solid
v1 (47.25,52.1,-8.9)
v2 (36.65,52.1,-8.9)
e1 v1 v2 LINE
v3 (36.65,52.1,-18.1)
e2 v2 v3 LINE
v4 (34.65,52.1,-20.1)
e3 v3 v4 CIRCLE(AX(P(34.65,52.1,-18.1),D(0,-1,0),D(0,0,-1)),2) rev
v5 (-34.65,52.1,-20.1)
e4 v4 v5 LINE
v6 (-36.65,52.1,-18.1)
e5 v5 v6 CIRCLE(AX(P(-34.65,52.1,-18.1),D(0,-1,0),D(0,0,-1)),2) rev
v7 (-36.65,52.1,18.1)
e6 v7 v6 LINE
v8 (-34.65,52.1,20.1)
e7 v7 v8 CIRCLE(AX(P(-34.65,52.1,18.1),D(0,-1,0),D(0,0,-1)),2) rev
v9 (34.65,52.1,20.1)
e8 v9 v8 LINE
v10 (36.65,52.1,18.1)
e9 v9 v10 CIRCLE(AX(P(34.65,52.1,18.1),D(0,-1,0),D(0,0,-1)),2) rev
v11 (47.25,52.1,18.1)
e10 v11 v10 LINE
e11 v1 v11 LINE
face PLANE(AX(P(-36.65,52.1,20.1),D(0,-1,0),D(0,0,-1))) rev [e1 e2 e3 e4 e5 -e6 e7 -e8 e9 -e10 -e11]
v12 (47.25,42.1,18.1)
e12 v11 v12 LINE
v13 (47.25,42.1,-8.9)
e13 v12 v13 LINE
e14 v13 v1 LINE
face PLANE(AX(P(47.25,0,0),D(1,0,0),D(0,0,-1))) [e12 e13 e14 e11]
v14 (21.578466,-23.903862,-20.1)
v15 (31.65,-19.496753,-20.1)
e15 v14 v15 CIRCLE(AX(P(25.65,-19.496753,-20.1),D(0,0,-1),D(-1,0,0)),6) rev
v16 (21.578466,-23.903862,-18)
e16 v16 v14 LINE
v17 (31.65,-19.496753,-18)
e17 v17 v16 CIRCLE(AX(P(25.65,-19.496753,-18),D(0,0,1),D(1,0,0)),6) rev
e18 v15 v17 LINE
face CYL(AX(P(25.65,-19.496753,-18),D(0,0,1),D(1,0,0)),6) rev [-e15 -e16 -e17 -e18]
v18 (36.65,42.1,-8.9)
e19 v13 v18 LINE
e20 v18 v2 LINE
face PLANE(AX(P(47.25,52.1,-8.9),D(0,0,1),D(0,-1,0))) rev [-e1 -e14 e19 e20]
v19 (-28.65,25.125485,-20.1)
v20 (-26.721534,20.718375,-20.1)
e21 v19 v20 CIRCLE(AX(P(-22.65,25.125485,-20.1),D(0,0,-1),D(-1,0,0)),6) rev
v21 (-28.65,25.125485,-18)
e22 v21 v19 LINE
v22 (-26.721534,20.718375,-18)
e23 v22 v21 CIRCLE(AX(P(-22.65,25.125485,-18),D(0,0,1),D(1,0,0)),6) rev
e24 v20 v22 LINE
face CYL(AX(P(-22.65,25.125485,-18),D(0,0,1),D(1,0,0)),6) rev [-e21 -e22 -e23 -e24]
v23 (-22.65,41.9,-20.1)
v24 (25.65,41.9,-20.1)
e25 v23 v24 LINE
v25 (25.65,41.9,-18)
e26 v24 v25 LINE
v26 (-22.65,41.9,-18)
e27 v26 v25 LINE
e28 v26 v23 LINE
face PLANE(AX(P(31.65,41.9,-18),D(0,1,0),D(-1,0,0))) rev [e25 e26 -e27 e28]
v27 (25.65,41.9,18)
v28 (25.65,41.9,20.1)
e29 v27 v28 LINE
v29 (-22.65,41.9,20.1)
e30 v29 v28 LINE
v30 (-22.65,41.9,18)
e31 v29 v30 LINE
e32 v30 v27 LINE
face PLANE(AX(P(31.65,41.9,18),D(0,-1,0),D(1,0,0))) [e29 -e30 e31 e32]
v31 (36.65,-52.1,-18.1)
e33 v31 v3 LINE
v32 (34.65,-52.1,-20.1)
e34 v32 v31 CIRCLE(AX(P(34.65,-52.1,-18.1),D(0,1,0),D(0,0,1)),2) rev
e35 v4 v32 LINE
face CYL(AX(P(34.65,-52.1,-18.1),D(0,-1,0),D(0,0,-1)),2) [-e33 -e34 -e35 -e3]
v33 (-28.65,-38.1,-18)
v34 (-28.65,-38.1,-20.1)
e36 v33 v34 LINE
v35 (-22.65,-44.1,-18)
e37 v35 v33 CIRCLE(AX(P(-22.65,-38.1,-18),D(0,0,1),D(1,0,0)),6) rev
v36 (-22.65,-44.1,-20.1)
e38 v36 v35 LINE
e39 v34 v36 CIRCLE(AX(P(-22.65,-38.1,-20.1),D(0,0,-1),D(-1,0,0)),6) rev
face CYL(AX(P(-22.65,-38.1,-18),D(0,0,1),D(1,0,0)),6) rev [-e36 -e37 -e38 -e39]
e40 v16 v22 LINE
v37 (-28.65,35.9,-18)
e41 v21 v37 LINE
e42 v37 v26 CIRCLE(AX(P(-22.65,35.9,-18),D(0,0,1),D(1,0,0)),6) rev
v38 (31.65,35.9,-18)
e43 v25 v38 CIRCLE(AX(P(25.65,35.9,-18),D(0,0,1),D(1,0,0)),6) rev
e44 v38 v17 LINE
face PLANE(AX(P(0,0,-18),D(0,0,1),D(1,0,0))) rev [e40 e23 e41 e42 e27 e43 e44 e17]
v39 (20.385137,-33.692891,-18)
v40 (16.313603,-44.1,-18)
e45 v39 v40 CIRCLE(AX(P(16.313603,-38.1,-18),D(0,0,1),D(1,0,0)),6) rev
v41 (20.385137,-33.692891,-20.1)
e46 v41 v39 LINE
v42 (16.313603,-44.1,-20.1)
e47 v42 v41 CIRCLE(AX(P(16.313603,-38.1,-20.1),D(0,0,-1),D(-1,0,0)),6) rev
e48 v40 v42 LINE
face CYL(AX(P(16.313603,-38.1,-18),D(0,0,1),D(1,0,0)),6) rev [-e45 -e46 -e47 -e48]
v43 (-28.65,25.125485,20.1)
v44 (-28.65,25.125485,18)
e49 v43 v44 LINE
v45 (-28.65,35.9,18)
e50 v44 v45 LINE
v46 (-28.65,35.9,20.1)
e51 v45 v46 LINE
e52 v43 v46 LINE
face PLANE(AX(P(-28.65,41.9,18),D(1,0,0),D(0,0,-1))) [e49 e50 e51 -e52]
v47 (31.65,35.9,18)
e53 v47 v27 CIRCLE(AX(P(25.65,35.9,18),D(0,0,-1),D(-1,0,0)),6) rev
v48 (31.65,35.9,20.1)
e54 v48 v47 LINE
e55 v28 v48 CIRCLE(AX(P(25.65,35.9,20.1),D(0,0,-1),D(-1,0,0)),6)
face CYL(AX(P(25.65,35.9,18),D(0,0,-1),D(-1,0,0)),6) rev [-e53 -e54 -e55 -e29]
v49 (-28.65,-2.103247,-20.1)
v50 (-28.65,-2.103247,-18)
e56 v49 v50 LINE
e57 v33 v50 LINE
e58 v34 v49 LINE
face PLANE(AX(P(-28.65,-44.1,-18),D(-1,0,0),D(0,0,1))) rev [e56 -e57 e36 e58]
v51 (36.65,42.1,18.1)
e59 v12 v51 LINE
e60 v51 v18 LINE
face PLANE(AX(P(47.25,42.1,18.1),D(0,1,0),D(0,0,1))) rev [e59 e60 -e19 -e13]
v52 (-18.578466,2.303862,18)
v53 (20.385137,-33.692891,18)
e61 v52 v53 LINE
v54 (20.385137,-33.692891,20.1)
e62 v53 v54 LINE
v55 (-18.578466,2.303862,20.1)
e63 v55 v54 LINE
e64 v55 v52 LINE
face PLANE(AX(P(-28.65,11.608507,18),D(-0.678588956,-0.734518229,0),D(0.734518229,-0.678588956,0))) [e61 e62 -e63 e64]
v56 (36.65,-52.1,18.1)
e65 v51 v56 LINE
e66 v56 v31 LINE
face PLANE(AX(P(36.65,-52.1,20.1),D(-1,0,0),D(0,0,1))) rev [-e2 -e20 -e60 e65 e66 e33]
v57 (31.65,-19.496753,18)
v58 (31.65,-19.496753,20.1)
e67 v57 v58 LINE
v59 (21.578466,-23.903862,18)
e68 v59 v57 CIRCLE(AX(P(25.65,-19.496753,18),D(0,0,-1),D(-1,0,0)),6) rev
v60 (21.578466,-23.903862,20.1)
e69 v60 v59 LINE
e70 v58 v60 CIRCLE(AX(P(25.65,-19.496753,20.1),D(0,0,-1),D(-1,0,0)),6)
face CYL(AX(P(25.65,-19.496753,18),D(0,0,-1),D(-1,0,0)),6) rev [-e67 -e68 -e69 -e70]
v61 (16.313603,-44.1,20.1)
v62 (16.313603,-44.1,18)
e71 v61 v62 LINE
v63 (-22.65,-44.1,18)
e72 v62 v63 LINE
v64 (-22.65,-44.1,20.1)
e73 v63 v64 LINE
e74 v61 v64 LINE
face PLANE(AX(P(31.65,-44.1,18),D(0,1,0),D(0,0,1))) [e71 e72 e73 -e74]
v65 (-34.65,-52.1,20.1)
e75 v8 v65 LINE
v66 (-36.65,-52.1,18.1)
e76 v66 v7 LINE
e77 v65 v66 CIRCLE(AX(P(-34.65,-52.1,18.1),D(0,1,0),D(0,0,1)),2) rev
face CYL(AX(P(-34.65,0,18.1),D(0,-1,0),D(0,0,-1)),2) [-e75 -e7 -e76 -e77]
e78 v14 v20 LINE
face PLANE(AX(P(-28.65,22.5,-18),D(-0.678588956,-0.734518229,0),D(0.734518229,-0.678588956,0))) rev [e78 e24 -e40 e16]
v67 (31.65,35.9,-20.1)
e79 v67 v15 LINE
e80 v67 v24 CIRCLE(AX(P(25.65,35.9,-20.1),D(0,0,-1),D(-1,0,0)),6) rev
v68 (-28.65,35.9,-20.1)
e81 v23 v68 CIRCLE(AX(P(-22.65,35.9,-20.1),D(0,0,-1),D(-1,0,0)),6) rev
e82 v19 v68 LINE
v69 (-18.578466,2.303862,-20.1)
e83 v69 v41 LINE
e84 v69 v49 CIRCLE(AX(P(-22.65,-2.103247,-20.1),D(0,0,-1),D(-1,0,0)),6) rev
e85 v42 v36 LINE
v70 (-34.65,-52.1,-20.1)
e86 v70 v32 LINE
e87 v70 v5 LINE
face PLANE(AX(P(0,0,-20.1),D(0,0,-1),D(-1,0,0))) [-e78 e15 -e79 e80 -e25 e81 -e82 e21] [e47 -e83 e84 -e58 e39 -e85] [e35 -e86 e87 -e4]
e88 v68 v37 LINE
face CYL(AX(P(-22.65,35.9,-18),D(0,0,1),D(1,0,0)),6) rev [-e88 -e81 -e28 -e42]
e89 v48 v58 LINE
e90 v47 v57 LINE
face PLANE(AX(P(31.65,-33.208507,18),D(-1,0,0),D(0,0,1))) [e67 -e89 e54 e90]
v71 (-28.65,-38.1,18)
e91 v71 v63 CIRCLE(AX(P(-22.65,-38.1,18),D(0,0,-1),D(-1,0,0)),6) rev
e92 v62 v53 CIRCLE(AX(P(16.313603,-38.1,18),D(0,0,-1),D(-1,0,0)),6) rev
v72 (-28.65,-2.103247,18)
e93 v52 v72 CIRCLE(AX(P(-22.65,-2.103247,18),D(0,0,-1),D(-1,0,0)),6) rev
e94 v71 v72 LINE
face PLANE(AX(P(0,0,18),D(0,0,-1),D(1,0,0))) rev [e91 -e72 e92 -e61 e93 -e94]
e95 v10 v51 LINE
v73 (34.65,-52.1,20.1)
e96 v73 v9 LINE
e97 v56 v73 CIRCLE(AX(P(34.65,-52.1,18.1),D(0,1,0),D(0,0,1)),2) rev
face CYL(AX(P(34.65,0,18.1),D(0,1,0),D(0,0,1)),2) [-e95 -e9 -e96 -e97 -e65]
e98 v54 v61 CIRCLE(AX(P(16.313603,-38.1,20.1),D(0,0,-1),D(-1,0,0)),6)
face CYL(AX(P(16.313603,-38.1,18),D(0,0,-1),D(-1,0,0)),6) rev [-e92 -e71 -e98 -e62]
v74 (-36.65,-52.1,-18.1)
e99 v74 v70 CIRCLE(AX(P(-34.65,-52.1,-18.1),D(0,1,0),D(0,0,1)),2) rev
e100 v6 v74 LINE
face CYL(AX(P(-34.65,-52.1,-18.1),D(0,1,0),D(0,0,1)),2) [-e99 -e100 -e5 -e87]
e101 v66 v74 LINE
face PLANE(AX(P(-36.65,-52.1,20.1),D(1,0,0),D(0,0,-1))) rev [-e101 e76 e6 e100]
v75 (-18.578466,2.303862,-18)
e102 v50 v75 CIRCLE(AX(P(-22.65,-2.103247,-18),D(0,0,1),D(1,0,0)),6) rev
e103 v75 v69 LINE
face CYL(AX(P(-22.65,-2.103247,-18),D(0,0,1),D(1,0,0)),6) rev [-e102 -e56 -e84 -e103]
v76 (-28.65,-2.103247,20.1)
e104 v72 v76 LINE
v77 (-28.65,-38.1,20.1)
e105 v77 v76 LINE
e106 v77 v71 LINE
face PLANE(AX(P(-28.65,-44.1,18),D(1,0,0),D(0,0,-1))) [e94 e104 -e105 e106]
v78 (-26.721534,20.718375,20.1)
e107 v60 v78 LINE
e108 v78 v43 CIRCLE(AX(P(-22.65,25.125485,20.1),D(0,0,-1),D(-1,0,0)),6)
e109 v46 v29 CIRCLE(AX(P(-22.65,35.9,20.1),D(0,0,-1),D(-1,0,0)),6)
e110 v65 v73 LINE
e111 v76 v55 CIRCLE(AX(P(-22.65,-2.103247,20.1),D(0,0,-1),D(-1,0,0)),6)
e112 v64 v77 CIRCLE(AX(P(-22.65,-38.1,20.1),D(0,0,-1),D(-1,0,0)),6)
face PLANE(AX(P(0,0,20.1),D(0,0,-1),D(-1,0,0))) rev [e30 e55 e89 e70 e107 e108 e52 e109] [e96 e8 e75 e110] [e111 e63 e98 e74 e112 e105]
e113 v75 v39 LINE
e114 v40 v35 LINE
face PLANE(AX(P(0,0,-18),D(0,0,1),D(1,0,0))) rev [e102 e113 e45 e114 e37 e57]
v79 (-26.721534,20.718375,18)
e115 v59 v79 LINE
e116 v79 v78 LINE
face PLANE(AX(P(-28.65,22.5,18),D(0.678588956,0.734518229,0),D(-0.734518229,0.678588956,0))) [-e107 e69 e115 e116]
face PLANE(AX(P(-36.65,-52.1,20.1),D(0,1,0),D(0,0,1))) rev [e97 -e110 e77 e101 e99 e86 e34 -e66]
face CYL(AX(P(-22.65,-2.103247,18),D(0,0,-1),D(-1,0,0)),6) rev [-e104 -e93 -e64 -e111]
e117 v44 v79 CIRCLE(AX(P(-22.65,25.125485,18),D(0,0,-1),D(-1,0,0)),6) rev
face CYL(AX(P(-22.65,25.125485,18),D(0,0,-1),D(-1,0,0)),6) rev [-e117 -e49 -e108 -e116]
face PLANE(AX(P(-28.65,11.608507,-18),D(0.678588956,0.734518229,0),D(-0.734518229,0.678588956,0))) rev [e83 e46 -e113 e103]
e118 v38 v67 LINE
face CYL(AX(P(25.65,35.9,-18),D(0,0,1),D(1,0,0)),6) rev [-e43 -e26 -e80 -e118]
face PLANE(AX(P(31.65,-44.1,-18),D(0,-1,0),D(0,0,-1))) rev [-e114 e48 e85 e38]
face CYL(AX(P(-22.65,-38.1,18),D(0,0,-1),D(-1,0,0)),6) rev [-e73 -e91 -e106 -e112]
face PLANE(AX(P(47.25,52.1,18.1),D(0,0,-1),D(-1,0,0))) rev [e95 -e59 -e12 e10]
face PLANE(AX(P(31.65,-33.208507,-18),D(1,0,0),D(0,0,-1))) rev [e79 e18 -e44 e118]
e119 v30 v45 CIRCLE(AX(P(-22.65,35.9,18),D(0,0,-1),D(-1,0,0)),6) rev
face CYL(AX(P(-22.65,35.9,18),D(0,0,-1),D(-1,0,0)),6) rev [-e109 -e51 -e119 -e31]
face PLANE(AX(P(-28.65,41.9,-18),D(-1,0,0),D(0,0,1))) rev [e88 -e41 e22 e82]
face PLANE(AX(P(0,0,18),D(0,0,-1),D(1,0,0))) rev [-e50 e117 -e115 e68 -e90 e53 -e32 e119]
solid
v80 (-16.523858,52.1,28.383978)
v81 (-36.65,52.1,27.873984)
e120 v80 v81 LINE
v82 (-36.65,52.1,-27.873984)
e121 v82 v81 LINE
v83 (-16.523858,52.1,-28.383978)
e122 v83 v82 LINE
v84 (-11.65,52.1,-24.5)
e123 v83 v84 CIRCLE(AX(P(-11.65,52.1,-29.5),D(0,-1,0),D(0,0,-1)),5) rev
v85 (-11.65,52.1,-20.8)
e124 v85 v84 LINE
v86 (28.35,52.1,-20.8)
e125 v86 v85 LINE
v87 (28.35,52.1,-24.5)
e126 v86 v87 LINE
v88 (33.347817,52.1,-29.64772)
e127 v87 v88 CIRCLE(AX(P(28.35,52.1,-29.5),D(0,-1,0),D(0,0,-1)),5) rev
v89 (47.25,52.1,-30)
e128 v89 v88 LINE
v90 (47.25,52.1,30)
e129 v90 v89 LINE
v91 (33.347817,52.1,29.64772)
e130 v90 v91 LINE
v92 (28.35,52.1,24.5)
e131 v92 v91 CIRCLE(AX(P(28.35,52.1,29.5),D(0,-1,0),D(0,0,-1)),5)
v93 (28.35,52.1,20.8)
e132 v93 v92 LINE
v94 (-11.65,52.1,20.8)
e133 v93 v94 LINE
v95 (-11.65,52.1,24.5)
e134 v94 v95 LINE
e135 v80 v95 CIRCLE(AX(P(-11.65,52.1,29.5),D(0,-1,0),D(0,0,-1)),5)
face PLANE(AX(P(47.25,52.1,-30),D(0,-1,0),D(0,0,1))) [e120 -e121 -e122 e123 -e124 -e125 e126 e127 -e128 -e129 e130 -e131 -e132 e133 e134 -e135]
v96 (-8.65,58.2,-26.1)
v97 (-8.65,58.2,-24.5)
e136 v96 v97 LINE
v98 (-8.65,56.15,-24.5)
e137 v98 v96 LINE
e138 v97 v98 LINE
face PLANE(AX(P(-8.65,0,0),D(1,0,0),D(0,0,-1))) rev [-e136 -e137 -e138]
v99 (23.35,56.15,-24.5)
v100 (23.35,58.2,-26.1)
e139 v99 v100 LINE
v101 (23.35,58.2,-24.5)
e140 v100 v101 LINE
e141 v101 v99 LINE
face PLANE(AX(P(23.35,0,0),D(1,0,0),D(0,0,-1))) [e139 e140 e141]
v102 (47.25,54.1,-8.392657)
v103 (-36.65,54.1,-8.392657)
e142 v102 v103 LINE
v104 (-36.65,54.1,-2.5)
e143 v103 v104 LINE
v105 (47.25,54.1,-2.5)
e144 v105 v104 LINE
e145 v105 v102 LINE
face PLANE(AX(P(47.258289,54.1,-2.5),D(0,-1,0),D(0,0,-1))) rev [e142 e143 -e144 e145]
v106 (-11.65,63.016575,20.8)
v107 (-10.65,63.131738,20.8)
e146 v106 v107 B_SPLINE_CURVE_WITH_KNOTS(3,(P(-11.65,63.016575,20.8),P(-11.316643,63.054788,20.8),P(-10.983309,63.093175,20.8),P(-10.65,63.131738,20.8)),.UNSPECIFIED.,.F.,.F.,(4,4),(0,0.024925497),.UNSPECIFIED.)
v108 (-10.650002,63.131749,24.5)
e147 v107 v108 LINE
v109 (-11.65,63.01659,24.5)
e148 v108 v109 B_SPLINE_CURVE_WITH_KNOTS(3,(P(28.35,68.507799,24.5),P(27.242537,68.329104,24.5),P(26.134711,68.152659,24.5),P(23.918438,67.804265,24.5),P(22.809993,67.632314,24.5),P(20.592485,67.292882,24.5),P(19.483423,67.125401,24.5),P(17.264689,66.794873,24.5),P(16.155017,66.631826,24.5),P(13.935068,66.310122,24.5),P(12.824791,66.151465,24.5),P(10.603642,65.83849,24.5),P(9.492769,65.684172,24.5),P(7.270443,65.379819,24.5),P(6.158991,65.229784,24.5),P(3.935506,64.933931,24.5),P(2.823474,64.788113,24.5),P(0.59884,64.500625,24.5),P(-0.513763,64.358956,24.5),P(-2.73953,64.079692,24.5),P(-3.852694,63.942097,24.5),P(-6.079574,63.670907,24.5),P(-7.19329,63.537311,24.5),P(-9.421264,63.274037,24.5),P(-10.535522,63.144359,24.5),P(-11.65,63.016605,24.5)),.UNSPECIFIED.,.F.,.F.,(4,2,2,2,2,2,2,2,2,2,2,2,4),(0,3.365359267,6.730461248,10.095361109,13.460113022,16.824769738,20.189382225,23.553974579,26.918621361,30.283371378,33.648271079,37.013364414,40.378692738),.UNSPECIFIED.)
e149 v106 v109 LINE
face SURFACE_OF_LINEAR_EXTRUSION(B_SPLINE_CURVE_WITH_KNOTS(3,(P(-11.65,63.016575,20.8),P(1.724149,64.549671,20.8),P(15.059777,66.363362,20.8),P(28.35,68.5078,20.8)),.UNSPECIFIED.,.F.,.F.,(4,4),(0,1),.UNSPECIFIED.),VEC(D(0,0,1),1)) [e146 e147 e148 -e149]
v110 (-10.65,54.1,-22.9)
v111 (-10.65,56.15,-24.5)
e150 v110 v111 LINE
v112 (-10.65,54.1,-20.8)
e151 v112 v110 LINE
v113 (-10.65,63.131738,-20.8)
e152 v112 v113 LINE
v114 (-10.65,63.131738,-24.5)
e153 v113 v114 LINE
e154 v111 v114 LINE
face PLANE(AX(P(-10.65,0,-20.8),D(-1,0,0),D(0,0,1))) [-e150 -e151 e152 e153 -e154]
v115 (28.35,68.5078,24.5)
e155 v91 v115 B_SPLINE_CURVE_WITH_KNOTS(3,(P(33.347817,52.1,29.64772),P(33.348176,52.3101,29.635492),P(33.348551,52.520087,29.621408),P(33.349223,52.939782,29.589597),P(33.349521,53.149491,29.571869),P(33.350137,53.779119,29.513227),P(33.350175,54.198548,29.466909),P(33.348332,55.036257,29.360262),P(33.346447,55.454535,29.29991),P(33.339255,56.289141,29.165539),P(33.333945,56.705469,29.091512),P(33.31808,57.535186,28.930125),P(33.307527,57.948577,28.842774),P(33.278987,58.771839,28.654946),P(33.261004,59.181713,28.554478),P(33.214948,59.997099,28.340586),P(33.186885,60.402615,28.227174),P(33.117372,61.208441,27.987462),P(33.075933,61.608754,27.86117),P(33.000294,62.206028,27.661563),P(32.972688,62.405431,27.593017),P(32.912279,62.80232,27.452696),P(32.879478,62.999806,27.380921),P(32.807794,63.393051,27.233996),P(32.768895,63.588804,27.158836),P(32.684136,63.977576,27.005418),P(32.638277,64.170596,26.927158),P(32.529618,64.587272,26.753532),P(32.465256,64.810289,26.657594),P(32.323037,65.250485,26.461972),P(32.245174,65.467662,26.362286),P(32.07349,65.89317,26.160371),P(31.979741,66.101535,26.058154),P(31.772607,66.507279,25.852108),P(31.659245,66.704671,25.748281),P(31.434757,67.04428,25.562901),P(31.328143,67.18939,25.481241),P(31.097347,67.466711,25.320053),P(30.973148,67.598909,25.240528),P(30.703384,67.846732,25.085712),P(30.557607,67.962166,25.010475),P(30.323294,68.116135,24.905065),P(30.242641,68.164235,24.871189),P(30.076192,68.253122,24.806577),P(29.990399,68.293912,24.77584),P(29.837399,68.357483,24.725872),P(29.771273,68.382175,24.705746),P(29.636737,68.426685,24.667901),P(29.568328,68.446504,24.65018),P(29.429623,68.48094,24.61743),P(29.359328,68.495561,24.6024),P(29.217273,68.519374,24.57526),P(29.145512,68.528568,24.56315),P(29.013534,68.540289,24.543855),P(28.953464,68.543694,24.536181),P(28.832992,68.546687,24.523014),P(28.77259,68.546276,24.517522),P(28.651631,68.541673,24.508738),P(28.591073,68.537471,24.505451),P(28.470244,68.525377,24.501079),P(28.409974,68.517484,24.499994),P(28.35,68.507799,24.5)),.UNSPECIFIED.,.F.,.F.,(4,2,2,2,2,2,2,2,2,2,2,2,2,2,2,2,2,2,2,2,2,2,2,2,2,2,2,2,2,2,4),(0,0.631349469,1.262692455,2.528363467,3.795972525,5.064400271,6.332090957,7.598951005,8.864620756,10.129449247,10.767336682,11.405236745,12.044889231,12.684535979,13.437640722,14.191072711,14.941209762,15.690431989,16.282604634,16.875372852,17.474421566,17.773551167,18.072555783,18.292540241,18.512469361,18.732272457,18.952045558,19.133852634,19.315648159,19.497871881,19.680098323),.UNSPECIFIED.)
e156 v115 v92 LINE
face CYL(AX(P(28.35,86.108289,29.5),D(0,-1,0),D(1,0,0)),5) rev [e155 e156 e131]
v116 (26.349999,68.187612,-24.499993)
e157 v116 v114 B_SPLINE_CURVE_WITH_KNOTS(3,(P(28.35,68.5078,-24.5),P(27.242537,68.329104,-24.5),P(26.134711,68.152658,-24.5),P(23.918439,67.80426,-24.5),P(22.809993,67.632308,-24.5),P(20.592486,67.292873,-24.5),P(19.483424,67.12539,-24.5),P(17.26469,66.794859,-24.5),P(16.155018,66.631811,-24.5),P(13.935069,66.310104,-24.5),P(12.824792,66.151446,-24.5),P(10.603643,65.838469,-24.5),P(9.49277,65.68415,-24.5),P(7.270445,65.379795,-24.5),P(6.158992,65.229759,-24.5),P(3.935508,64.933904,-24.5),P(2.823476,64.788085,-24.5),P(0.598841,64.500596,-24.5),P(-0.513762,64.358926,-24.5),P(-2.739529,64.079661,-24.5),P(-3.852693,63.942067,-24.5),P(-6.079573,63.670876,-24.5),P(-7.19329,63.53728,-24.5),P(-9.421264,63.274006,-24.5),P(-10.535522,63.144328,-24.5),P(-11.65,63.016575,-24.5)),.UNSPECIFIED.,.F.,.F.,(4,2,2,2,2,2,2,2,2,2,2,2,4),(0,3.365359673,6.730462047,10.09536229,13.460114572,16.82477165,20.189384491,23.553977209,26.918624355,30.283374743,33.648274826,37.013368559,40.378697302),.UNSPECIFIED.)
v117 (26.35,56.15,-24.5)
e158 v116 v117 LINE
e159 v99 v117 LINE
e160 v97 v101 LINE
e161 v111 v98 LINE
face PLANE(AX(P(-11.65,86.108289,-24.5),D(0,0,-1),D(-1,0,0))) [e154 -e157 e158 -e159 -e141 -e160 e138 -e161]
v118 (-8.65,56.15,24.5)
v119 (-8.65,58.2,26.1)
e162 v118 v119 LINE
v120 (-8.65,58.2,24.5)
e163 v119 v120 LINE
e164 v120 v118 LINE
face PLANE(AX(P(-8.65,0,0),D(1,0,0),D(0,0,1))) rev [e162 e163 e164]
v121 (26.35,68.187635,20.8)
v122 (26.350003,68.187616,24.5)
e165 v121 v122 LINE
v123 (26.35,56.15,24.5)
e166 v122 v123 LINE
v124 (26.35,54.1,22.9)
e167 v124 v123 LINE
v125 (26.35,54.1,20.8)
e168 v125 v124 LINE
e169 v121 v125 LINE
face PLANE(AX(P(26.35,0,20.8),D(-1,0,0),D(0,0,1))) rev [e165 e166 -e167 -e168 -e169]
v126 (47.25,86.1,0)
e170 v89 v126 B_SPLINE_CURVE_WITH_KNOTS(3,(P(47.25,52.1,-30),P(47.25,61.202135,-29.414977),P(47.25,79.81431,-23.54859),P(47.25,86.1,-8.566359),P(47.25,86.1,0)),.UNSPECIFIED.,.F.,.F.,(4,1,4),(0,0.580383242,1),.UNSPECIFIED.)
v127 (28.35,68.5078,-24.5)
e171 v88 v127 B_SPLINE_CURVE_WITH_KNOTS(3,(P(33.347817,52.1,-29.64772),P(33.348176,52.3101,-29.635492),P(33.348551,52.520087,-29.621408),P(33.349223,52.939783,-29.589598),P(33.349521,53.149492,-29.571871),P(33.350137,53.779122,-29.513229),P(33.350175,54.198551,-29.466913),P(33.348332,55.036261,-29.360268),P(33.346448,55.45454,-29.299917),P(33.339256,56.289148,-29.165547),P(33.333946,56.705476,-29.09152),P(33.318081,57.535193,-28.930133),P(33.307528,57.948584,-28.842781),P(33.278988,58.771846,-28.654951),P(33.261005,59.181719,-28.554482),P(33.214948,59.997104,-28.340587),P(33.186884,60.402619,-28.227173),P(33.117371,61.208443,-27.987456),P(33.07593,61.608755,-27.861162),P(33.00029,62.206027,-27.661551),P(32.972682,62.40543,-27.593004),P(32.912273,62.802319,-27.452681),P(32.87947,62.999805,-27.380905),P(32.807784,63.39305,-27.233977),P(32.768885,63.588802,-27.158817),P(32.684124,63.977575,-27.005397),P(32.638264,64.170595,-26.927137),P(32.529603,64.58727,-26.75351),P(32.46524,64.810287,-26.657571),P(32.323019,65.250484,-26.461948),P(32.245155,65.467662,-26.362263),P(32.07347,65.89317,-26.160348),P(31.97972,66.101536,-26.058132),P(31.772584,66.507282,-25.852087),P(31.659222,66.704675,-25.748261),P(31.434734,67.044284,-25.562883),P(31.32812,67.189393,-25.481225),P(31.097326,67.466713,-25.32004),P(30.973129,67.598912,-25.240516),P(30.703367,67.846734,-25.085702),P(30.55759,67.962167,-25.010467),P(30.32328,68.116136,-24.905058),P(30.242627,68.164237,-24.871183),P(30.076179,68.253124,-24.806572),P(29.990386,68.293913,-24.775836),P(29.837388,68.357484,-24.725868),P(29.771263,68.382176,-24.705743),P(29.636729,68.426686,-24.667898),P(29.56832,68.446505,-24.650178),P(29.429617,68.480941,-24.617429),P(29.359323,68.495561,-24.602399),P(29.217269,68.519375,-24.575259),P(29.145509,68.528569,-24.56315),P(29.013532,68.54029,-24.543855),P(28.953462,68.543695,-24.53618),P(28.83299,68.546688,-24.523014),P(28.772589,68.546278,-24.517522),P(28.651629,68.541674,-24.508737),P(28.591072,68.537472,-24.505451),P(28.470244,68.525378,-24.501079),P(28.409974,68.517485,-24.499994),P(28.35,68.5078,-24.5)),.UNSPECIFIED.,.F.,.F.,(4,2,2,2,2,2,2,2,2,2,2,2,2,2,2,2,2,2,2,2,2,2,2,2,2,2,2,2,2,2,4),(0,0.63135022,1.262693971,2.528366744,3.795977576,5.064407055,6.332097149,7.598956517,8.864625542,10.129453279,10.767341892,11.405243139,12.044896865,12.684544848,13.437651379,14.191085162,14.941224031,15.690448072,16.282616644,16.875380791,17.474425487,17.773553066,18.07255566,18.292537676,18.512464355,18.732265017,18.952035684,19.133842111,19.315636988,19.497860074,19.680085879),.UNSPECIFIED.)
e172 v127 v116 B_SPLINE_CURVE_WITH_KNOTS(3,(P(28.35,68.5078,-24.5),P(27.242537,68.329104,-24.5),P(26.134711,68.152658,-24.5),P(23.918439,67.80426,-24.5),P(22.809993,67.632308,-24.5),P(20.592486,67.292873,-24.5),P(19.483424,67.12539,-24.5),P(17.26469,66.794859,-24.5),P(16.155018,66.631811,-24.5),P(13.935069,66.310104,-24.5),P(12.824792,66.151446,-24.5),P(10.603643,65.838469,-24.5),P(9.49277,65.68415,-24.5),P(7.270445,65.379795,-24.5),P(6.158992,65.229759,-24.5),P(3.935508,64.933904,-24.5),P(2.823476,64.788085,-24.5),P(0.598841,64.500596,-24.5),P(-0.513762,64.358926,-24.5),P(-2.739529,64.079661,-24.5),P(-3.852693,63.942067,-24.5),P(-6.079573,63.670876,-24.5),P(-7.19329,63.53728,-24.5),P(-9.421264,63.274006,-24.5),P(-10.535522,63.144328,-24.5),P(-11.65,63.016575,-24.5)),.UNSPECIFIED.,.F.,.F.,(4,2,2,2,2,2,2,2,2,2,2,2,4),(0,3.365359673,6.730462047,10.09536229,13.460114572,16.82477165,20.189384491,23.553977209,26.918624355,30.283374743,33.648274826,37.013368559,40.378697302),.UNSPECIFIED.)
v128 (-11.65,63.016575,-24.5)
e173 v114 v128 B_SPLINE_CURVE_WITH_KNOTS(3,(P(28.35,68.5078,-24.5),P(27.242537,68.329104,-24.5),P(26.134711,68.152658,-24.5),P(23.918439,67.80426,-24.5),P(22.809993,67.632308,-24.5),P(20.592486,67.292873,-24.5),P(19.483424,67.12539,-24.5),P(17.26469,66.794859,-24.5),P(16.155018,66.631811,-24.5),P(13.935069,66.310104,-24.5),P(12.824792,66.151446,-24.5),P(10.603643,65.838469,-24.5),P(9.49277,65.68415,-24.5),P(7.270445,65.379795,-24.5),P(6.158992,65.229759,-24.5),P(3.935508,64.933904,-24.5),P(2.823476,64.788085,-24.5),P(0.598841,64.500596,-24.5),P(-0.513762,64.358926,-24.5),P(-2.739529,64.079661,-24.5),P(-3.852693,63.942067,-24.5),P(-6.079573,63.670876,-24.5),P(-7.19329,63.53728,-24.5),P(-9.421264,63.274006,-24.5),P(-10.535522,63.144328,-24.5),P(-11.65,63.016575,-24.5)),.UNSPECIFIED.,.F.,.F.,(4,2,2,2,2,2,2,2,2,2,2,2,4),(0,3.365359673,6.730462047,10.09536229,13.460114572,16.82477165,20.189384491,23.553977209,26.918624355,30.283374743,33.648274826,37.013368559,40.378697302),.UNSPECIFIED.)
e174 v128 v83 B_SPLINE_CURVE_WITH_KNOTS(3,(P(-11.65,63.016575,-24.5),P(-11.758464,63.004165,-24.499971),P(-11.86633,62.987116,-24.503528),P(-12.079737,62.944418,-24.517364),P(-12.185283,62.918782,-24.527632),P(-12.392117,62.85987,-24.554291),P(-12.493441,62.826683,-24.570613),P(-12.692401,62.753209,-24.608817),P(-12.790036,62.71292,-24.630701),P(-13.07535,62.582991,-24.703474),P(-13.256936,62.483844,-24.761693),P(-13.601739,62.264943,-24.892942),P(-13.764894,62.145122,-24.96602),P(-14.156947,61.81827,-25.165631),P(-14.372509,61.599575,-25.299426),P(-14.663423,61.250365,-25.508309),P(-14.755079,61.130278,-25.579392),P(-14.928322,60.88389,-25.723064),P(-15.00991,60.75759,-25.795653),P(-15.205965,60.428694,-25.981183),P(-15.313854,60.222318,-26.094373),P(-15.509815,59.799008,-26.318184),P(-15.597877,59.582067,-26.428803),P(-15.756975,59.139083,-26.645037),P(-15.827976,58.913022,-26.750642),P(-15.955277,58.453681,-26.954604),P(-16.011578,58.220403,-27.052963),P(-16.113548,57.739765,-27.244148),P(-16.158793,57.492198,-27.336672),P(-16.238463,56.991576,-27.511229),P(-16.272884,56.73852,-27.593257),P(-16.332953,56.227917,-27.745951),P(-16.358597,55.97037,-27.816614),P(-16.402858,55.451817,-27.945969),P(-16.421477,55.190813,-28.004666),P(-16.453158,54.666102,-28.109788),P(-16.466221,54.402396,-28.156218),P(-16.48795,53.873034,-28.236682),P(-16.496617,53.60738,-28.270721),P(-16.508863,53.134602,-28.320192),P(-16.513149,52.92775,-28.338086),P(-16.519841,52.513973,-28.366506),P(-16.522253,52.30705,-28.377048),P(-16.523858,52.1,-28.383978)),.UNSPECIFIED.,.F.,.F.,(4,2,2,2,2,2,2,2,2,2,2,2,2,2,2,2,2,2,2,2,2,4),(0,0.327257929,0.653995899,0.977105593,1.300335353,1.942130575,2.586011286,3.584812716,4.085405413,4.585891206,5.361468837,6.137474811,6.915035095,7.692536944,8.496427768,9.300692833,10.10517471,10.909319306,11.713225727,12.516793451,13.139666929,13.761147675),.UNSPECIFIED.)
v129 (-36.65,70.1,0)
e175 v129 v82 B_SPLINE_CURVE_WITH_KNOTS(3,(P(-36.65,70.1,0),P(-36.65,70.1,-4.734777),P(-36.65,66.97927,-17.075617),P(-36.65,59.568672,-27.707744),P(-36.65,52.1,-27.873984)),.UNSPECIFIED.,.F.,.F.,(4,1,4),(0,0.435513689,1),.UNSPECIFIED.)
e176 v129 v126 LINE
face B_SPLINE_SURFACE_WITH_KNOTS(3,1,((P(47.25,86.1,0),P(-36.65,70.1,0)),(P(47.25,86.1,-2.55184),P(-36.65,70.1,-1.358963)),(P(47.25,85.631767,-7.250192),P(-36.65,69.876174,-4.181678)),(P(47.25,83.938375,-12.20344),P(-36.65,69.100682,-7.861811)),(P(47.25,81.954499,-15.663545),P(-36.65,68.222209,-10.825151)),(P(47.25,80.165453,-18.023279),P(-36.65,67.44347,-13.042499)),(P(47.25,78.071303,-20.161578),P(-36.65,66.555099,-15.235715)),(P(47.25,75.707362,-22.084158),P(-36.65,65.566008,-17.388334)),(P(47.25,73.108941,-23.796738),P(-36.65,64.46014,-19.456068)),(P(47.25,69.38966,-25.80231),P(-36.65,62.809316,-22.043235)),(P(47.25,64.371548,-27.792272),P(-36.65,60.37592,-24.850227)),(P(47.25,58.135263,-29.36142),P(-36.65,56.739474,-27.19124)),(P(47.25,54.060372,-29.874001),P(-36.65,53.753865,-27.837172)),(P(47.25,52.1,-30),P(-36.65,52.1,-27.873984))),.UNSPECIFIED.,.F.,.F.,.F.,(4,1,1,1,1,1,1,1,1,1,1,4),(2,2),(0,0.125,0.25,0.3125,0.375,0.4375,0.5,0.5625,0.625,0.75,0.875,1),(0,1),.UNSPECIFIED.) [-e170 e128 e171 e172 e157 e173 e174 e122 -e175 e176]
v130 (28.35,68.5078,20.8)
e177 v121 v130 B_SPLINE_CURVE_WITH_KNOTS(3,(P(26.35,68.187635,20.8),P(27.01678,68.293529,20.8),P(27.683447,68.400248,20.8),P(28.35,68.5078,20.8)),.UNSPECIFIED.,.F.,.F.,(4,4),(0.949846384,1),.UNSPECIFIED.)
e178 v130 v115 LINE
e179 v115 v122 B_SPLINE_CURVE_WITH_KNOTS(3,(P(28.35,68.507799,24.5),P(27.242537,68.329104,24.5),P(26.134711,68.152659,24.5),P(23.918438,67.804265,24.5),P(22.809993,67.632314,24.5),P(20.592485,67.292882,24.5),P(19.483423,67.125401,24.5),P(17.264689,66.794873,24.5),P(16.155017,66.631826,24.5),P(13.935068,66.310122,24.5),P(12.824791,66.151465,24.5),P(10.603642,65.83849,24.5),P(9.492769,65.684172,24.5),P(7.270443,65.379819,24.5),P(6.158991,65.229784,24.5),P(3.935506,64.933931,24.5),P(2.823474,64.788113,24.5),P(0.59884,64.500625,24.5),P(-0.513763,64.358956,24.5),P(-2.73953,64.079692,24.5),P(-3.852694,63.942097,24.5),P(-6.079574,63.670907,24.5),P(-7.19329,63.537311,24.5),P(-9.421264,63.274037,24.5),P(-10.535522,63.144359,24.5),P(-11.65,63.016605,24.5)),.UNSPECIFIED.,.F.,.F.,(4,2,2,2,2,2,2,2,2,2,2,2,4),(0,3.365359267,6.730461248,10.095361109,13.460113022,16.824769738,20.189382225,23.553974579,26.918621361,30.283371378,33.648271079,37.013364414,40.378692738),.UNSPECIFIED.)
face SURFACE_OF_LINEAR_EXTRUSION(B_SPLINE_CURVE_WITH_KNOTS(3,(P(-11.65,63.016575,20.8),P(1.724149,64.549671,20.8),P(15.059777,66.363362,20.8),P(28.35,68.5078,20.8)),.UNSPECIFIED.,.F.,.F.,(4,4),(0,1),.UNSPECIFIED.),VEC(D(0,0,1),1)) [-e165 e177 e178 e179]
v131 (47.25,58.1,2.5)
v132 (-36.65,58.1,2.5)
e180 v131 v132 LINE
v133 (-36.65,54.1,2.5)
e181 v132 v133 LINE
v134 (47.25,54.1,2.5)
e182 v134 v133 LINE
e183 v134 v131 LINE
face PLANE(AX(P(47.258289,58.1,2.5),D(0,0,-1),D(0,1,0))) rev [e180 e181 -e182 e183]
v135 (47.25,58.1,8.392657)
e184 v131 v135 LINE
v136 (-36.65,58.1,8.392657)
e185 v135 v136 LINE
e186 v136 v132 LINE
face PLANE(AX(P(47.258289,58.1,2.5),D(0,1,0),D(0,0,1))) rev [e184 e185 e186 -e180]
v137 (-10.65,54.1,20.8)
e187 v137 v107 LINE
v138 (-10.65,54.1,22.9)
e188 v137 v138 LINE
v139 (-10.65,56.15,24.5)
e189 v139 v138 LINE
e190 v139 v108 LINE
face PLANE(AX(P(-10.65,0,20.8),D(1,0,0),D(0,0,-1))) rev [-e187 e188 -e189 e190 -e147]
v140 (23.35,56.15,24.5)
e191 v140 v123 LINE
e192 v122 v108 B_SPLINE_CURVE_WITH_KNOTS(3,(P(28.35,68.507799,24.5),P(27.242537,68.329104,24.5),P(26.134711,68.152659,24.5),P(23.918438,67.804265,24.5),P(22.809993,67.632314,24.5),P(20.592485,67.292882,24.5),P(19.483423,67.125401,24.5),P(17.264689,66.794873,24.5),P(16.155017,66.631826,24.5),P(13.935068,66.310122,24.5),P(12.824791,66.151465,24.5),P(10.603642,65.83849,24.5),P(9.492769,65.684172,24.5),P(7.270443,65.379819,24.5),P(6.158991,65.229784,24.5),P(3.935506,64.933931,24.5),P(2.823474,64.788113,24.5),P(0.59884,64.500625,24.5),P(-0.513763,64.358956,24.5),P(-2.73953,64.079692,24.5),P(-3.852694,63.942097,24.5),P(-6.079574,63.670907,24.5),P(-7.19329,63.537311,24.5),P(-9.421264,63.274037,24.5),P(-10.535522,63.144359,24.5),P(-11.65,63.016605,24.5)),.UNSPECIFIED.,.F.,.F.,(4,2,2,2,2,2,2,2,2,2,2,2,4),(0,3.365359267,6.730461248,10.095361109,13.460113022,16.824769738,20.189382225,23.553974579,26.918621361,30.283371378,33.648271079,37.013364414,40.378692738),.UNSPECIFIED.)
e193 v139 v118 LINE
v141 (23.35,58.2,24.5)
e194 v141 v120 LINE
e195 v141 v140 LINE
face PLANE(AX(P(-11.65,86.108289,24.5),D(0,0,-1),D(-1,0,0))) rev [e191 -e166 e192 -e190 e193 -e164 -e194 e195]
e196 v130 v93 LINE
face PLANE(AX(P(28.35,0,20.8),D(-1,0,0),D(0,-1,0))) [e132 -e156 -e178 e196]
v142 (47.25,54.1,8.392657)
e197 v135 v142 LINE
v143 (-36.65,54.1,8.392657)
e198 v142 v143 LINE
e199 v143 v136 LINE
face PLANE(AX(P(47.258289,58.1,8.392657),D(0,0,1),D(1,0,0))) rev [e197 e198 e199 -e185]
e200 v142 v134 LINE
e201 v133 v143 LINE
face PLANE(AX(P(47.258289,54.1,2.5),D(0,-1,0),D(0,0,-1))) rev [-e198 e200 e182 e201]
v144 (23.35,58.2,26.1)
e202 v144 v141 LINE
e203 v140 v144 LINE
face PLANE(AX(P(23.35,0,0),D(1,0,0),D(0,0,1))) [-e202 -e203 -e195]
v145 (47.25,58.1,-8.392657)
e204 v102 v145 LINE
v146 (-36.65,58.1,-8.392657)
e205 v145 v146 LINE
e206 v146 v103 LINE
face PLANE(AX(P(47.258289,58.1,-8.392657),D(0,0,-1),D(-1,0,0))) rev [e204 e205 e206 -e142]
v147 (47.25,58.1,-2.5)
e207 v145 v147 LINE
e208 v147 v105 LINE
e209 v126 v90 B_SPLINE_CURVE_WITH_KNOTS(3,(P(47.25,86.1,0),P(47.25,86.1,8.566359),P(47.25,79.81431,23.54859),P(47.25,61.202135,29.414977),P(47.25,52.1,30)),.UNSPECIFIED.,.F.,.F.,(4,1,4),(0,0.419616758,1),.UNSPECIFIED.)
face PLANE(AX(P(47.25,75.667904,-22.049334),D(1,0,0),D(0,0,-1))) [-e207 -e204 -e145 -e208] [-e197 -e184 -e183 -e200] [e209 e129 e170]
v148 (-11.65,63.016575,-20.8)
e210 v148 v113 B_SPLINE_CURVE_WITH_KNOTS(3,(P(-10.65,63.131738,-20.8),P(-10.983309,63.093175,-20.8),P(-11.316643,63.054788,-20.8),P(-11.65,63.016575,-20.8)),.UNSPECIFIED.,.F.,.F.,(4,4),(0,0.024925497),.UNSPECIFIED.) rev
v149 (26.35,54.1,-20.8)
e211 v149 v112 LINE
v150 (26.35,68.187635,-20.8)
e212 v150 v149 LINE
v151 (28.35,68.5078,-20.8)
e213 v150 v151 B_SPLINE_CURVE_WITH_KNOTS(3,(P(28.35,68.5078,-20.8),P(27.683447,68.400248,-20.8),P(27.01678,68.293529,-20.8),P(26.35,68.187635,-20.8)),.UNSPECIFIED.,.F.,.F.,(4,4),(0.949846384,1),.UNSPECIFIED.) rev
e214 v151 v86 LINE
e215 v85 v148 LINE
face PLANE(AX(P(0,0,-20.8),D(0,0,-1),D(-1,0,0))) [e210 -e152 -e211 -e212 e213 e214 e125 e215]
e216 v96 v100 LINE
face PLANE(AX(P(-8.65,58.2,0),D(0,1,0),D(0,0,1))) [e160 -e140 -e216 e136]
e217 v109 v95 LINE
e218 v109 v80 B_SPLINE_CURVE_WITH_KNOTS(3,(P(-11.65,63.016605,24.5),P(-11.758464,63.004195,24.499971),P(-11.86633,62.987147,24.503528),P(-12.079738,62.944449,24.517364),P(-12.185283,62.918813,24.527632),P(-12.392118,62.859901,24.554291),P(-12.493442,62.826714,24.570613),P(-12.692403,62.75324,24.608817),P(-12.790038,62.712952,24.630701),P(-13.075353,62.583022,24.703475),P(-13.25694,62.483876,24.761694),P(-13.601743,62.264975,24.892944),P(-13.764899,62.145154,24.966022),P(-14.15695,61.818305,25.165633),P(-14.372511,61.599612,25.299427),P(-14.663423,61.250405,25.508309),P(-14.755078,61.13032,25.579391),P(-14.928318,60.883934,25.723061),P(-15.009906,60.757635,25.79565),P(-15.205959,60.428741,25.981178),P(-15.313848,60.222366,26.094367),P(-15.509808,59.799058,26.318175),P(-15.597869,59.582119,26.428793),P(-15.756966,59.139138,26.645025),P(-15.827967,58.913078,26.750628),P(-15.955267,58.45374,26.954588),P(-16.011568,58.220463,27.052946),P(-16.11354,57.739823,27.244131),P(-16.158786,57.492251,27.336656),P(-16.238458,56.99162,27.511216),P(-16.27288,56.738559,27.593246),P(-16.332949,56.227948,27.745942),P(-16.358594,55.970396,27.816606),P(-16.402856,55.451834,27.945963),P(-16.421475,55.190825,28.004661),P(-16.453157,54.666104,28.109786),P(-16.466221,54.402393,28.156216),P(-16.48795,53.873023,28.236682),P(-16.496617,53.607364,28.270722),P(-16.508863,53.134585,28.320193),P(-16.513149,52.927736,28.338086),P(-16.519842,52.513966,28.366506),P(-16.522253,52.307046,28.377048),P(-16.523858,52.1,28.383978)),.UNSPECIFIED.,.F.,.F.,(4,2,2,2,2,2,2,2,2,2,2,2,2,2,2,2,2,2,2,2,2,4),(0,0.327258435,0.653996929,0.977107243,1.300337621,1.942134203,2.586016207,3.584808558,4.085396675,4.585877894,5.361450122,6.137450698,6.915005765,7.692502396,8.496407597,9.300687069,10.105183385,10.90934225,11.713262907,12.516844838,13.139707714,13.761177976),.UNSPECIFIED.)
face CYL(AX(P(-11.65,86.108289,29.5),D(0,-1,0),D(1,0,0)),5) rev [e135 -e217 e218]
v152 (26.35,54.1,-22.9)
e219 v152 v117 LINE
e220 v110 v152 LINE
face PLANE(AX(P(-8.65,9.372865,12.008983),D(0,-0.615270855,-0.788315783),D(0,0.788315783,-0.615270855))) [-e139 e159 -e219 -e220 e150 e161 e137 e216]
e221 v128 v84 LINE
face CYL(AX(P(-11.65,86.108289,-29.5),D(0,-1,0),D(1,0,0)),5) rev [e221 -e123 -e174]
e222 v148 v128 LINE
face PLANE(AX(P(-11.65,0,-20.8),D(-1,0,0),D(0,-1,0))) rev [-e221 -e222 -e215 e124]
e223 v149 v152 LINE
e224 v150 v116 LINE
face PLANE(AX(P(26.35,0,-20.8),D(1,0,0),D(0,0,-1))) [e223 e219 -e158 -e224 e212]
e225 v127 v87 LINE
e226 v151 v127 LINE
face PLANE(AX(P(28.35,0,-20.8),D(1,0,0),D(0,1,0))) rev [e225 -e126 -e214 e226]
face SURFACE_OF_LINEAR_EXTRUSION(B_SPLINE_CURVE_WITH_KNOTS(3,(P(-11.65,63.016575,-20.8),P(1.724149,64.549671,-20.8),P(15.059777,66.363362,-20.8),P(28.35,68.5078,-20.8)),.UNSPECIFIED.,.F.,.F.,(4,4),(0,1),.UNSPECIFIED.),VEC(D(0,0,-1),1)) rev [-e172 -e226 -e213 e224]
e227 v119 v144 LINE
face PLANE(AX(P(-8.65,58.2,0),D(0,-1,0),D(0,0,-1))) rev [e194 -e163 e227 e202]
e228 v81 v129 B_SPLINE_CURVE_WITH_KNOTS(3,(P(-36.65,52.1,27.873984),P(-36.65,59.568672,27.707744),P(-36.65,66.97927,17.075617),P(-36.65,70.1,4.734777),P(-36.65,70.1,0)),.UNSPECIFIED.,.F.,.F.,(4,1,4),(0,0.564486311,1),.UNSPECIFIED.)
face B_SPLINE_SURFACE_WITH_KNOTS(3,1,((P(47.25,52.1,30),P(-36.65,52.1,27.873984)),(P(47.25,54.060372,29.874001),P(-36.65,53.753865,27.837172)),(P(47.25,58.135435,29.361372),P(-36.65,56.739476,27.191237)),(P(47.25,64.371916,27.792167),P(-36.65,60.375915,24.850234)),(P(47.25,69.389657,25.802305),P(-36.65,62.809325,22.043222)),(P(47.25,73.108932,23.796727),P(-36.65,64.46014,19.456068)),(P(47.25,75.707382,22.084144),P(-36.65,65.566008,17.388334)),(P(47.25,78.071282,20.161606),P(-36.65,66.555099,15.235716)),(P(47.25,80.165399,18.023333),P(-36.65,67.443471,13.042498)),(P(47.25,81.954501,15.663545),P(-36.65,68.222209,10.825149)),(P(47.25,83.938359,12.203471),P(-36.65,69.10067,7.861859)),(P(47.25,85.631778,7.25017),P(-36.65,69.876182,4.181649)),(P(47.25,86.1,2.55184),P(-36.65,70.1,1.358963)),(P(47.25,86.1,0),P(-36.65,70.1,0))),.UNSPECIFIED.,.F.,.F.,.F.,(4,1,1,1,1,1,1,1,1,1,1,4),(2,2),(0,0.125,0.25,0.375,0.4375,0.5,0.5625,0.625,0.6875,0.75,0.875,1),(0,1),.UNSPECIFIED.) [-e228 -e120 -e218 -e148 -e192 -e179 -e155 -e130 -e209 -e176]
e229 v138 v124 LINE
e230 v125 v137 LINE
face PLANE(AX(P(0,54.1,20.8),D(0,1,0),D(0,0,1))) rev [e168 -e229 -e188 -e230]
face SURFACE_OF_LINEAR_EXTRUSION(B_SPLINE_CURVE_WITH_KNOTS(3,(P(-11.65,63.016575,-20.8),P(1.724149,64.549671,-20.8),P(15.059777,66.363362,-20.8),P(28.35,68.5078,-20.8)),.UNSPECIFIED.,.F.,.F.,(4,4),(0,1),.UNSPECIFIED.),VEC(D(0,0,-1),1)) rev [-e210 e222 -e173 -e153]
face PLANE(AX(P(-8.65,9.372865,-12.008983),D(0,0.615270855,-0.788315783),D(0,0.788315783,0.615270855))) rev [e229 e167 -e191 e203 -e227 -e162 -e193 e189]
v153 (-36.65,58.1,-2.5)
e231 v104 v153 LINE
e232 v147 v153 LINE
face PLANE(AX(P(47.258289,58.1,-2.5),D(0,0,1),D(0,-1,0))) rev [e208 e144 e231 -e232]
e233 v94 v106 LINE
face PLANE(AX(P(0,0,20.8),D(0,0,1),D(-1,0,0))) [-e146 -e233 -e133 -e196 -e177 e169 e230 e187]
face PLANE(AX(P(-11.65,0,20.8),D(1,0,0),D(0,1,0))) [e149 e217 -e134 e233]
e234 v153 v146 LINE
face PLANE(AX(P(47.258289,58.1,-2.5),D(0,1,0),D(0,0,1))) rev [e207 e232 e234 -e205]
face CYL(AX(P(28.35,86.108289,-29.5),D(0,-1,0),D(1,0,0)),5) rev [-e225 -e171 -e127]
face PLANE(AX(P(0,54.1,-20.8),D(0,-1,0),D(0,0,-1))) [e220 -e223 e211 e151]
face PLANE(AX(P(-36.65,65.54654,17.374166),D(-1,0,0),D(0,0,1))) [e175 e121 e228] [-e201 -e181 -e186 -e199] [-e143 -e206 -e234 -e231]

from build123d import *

# Parameters (mm, degrees)
SKETCH_1_W             = 73.3
SKETCH_1_H             = 104.2
EXTRUDE_1_DEPTH        = 20.1
SKETCH_2_W             = 27
SKETCH_2_H             = 10
EXTRUDE_2_DEPTH        = 10.6
CUT_EXTRUDE_1_DEPTH    = 150.103328411
SKETCH_13_W            = 5.892656798
SKETCH_13_H            = 4
CUT_EXTRUDE_4_DEPTH    = 124.904883035
FILLET_5_R             = 2
CUT_EXTRUDE_5_DEPTH    = 2.1
FILLET_6_R             = 6
FILLET_6_OF_MIRROR_2_R = 6
CUT_EXTRUDE_START      = -3.7
CUT_EXTRUDE_6_DEPTH    = 3.7
EXTRUDE_START          = -3
EXTRUDE_5_DEPTH        = 32
CUT_EXTRUDE_7_DEPTH    = 37


# Read off the part's stored shape, not the designer's step: 切除-拉伸6
with BuildPart() as part:
    # 草图1 → 凸台-拉伸1 (new, symmetric)
    with BuildSketch(Plane.XY):
        Rectangle(SKETCH_1_W, SKETCH_1_H)
    extrude(amount=EXTRUDE_1_DEPTH, both=True)

    # 草图2 → 凸台-拉伸2 (add)
    with BuildSketch(Plane(origin=(36.65, 0, 0), x_dir=(0, 0, -1), z_dir=(1, 0, 0))):
        with Locations((-4.6, 47.1)):
            Rectangle(SKETCH_2_W, SKETCH_2_H)
    extrude(amount=EXTRUDE_2_DEPTH)

    # 圆角5
    fillet_5_edges = [part.edges().sort_by_distance(p)[0] for p in [
        (36.65, 0, 20.1),
        (-36.65, 0, 20.1),
        (-36.65, 0, -20.1),
        (36.65, 0, -20.1),
    ]]
    fillet(fillet_5_edges, radius=FILLET_5_R - 0.0001)  # a hair under: the kernel refuses the full size

    # 草图14 → 切除-拉伸5 (cut)
    with BuildSketch(Plane(origin=(0, 0, -20.1), x_dir=(-1, 0, 0), z_dir=(0, 0, -1))):
        Polygon((-31.65, 41.9), (28.65, 41.9), (28.65, 22.5), (-31.65, -33.208507203), align=None)
        Polygon((-31.65, -44.1), (28.65, -44.1), (28.65, 11.608507203), align=None)
    cut_extrude_5 = extrude(amount=-CUT_EXTRUDE_5_DEPTH, mode=Mode.SUBTRACT)

    # 圆角6
    fillet_6_edges = [part.edges().sort_by_distance(p)[0] for p in [
        (31.65, -33.208507203, -19.05),
        (31.65, 41.9, -19.05),
        (-28.65, 41.9, -19.05),
        (-28.65, 22.5, -19.05),
        (31.65, -44.1, -19.05),
        (-28.65, 11.608507203, -19.05),
        (-28.65, -44.1, -19.05),
    ]]
    fillet(fillet_6_edges, radius=FILLET_6_R)

    # 镜向2: 切除-拉伸5 across plane
    add(cut_extrude_5.mirror(Plane.XY), mode=Mode.SUBTRACT)

    # 圆角6 of 镜向2
    fillet_6_of_mirror_2_edges = [part.edges().sort_by_distance(p)[0] for p in [
        (31.65, -33.208507203, 19.05),
        (31.65, 41.9, 19.05),
        (-28.65, 41.9, 19.05),
        (-28.65, 22.5, 19.05),
        (31.65, -44.1, 19.05),
        (-28.65, 11.608507203, 19.05),
        (-28.65, -44.1, 19.05),
    ]]
    fillet(fillet_6_of_mirror_2_edges, radius=FILLET_6_OF_MIRROR_2_R)


with BuildPart() as body_2:
    # 草图8 → 放样11 section 0
    with BuildSketch(Plane(origin=(47.25, 0, 0), x_dir=(0, 0, -1), z_dir=(1, 0, 0))):
        with BuildLine():
            Line((-30, 52.1), (30, 52.1))
            add(Edge.make_bspline(
                [(0, 86.1), (8.566359437, 86.1), (23.54859031, 79.814309679), (29.414977023, 61.202134763), (30, 52.1)],
                knots=[0, 0, 0, 0, 0.419616758, 1, 1, 1, 1], degree=3))
            add(Edge.make_bspline(
                [(0, 86.1), (-8.566359437, 86.1), (-23.54859031, 79.814309679), (-29.414977023, 61.202134763), (-30, 52.1)],
                knots=[0, 0, 0, 0, 0.419616758, 1, 1, 1, 1], degree=3))
        make_face()
    # 草图9 → 放样11 section 1
    with BuildSketch(Plane.ZY.offset(36.65)):
        with BuildLine():
            Line((-27.873983974, 52.1), (27.873983974, 52.1))
            add(Edge.make_bspline(
                [(0, 70.1), (4.734777204, 70.1), (17.075617158, 66.979270336), (27.707744353, 59.568671532), (27.873983974, 52.1)],
                knots=[0, 0, 0, 0, 0.435513689, 1, 1, 1, 1], degree=3))
            add(Edge.make_bspline(
                [(0, 70.1), (-4.734777204, 70.1), (-17.075617158, 66.979270336), (-27.707744353, 59.568671532), (-27.873983974, 52.1)],
                knots=[0, 0, 0, 0, 0.435513689, 1, 1, 1, 1], degree=3))
        make_face()
    loft()

    # 草图10 → 切除-拉伸1 (cut, through all)
    with BuildSketch(Plane.XZ.offset(52.1)):
        with BuildLine():
            Line((-11.65, 34.5), (28.35, 34.5))
            ThreePointArc((28.35, 34.5), (33.35, 29.5), (28.35, 24.5))
            Line((28.35, 24.5), (-11.65, 24.5))
            ThreePointArc((-11.65, 24.5), (-16.65, 29.5), (-11.65, 34.5))
        make_face()
    cut_extrude_1 = extrude(amount=-CUT_EXTRUDE_1_DEPTH, mode=Mode.SUBTRACT)

    # 镜向1: 切除-拉伸1 across plane
    add(cut_extrude_1.mirror(Plane.XY), mode=Mode.SUBTRACT)

    # 草图13 → 切除-拉伸4 (cut, through all)
    with BuildSketch(Plane.ZY.offset(36.65)):
        with Locations((5.446328399, 56.1)):
            Rectangle(SKETCH_13_W, SKETCH_13_H)
        with Locations((-5.446328399, 56.1)):
            Rectangle(SKETCH_13_W, SKETCH_13_H)
    extrude(amount=-CUT_EXTRUDE_4_DEPTH, mode=Mode.SUBTRACT)

    # 切除-拉伸6 outline → 切除-拉伸6 (cut)
    with BuildSketch(Plane(origin=(0, 0, -24.5), x_dir=(-1, 0, 0), z_dir=(0, 0, -1)).offset(CUT_EXTRUDE_START)):
        with BuildLine():
            Line((11.65, 52.1), (11.65, 63.016574647))
            add(Edge.make_bspline(
                [(11.65, 63.016574647), (11.316642702, 63.054787825), (10.983309337, 63.093175333), (10.65000001, 63.131737945)],
                knots=[0, 0, 0, 0, 0.024925497, 0.024925497, 0.024925497, 0.024925497], degree=3))
            Line((10.65000001, 63.131737945), (10.65, 54.1))
            Line((10.65, 54.1), (-26.35, 54.1))
            Line((-26.35, 54.1), (-26.349995612, 68.187634584))
            add(Edge.make_bspline(
                [(-26.349995612, 68.187634584), (-27.016777374, 68.29352852), (-27.683445793, 68.400248086), (-28.35, 68.507799608)],
                knots=[0.949846275, 0.949846275, 0.949846275, 0.949846275, 1, 1, 1, 1], degree=3))
            Line((-28.35, 68.507799608), (-28.35, 52.1))
            Line((-28.35, 52.1), (11.65, 52.1))
        make_face()
    cut_extrude_6 = extrude(amount=CUT_EXTRUDE_6_DEPTH, mode=Mode.SUBTRACT)

    # 草图18 → 凸台-拉伸5 (add)
    with BuildSketch(Plane(origin=(26.35, 0, 0), x_dir=(0, 0, -1), z_dir=(1, 0, 0)).offset(EXTRUDE_START)):
        Polygon((24.5, 58.2), (24.5, 56.15), (26.1, 58.2), align=None)
    extrude_5 = extrude(amount=-EXTRUDE_5_DEPTH)

    # 草图18<3> → 切除-拉伸7 (cut)
    with BuildSketch(Plane(origin=(26.35, 0, 0), x_dir=(0, 0, -1), z_dir=(1, 0, 0))):
        Polygon((22.9, 54.1), (24.5, 54.1), (24.5, 56.15), align=None)
    cut_extrude_7 = extrude(amount=-CUT_EXTRUDE_7_DEPTH, mode=Mode.SUBTRACT)

    # 镜向3: 切除-拉伸6, 凸台-拉伸5, 切除-拉伸7 across plane
    add(cut_extrude_6.mirror(Plane.XY), mode=Mode.SUBTRACT)
    add(extrude_5.mirror(Plane.XY))
    add(cut_extrude_7.mirror(Plane.XY), mode=Mode.SUBTRACT)


solid = Compound([part.part, body_2.part])
